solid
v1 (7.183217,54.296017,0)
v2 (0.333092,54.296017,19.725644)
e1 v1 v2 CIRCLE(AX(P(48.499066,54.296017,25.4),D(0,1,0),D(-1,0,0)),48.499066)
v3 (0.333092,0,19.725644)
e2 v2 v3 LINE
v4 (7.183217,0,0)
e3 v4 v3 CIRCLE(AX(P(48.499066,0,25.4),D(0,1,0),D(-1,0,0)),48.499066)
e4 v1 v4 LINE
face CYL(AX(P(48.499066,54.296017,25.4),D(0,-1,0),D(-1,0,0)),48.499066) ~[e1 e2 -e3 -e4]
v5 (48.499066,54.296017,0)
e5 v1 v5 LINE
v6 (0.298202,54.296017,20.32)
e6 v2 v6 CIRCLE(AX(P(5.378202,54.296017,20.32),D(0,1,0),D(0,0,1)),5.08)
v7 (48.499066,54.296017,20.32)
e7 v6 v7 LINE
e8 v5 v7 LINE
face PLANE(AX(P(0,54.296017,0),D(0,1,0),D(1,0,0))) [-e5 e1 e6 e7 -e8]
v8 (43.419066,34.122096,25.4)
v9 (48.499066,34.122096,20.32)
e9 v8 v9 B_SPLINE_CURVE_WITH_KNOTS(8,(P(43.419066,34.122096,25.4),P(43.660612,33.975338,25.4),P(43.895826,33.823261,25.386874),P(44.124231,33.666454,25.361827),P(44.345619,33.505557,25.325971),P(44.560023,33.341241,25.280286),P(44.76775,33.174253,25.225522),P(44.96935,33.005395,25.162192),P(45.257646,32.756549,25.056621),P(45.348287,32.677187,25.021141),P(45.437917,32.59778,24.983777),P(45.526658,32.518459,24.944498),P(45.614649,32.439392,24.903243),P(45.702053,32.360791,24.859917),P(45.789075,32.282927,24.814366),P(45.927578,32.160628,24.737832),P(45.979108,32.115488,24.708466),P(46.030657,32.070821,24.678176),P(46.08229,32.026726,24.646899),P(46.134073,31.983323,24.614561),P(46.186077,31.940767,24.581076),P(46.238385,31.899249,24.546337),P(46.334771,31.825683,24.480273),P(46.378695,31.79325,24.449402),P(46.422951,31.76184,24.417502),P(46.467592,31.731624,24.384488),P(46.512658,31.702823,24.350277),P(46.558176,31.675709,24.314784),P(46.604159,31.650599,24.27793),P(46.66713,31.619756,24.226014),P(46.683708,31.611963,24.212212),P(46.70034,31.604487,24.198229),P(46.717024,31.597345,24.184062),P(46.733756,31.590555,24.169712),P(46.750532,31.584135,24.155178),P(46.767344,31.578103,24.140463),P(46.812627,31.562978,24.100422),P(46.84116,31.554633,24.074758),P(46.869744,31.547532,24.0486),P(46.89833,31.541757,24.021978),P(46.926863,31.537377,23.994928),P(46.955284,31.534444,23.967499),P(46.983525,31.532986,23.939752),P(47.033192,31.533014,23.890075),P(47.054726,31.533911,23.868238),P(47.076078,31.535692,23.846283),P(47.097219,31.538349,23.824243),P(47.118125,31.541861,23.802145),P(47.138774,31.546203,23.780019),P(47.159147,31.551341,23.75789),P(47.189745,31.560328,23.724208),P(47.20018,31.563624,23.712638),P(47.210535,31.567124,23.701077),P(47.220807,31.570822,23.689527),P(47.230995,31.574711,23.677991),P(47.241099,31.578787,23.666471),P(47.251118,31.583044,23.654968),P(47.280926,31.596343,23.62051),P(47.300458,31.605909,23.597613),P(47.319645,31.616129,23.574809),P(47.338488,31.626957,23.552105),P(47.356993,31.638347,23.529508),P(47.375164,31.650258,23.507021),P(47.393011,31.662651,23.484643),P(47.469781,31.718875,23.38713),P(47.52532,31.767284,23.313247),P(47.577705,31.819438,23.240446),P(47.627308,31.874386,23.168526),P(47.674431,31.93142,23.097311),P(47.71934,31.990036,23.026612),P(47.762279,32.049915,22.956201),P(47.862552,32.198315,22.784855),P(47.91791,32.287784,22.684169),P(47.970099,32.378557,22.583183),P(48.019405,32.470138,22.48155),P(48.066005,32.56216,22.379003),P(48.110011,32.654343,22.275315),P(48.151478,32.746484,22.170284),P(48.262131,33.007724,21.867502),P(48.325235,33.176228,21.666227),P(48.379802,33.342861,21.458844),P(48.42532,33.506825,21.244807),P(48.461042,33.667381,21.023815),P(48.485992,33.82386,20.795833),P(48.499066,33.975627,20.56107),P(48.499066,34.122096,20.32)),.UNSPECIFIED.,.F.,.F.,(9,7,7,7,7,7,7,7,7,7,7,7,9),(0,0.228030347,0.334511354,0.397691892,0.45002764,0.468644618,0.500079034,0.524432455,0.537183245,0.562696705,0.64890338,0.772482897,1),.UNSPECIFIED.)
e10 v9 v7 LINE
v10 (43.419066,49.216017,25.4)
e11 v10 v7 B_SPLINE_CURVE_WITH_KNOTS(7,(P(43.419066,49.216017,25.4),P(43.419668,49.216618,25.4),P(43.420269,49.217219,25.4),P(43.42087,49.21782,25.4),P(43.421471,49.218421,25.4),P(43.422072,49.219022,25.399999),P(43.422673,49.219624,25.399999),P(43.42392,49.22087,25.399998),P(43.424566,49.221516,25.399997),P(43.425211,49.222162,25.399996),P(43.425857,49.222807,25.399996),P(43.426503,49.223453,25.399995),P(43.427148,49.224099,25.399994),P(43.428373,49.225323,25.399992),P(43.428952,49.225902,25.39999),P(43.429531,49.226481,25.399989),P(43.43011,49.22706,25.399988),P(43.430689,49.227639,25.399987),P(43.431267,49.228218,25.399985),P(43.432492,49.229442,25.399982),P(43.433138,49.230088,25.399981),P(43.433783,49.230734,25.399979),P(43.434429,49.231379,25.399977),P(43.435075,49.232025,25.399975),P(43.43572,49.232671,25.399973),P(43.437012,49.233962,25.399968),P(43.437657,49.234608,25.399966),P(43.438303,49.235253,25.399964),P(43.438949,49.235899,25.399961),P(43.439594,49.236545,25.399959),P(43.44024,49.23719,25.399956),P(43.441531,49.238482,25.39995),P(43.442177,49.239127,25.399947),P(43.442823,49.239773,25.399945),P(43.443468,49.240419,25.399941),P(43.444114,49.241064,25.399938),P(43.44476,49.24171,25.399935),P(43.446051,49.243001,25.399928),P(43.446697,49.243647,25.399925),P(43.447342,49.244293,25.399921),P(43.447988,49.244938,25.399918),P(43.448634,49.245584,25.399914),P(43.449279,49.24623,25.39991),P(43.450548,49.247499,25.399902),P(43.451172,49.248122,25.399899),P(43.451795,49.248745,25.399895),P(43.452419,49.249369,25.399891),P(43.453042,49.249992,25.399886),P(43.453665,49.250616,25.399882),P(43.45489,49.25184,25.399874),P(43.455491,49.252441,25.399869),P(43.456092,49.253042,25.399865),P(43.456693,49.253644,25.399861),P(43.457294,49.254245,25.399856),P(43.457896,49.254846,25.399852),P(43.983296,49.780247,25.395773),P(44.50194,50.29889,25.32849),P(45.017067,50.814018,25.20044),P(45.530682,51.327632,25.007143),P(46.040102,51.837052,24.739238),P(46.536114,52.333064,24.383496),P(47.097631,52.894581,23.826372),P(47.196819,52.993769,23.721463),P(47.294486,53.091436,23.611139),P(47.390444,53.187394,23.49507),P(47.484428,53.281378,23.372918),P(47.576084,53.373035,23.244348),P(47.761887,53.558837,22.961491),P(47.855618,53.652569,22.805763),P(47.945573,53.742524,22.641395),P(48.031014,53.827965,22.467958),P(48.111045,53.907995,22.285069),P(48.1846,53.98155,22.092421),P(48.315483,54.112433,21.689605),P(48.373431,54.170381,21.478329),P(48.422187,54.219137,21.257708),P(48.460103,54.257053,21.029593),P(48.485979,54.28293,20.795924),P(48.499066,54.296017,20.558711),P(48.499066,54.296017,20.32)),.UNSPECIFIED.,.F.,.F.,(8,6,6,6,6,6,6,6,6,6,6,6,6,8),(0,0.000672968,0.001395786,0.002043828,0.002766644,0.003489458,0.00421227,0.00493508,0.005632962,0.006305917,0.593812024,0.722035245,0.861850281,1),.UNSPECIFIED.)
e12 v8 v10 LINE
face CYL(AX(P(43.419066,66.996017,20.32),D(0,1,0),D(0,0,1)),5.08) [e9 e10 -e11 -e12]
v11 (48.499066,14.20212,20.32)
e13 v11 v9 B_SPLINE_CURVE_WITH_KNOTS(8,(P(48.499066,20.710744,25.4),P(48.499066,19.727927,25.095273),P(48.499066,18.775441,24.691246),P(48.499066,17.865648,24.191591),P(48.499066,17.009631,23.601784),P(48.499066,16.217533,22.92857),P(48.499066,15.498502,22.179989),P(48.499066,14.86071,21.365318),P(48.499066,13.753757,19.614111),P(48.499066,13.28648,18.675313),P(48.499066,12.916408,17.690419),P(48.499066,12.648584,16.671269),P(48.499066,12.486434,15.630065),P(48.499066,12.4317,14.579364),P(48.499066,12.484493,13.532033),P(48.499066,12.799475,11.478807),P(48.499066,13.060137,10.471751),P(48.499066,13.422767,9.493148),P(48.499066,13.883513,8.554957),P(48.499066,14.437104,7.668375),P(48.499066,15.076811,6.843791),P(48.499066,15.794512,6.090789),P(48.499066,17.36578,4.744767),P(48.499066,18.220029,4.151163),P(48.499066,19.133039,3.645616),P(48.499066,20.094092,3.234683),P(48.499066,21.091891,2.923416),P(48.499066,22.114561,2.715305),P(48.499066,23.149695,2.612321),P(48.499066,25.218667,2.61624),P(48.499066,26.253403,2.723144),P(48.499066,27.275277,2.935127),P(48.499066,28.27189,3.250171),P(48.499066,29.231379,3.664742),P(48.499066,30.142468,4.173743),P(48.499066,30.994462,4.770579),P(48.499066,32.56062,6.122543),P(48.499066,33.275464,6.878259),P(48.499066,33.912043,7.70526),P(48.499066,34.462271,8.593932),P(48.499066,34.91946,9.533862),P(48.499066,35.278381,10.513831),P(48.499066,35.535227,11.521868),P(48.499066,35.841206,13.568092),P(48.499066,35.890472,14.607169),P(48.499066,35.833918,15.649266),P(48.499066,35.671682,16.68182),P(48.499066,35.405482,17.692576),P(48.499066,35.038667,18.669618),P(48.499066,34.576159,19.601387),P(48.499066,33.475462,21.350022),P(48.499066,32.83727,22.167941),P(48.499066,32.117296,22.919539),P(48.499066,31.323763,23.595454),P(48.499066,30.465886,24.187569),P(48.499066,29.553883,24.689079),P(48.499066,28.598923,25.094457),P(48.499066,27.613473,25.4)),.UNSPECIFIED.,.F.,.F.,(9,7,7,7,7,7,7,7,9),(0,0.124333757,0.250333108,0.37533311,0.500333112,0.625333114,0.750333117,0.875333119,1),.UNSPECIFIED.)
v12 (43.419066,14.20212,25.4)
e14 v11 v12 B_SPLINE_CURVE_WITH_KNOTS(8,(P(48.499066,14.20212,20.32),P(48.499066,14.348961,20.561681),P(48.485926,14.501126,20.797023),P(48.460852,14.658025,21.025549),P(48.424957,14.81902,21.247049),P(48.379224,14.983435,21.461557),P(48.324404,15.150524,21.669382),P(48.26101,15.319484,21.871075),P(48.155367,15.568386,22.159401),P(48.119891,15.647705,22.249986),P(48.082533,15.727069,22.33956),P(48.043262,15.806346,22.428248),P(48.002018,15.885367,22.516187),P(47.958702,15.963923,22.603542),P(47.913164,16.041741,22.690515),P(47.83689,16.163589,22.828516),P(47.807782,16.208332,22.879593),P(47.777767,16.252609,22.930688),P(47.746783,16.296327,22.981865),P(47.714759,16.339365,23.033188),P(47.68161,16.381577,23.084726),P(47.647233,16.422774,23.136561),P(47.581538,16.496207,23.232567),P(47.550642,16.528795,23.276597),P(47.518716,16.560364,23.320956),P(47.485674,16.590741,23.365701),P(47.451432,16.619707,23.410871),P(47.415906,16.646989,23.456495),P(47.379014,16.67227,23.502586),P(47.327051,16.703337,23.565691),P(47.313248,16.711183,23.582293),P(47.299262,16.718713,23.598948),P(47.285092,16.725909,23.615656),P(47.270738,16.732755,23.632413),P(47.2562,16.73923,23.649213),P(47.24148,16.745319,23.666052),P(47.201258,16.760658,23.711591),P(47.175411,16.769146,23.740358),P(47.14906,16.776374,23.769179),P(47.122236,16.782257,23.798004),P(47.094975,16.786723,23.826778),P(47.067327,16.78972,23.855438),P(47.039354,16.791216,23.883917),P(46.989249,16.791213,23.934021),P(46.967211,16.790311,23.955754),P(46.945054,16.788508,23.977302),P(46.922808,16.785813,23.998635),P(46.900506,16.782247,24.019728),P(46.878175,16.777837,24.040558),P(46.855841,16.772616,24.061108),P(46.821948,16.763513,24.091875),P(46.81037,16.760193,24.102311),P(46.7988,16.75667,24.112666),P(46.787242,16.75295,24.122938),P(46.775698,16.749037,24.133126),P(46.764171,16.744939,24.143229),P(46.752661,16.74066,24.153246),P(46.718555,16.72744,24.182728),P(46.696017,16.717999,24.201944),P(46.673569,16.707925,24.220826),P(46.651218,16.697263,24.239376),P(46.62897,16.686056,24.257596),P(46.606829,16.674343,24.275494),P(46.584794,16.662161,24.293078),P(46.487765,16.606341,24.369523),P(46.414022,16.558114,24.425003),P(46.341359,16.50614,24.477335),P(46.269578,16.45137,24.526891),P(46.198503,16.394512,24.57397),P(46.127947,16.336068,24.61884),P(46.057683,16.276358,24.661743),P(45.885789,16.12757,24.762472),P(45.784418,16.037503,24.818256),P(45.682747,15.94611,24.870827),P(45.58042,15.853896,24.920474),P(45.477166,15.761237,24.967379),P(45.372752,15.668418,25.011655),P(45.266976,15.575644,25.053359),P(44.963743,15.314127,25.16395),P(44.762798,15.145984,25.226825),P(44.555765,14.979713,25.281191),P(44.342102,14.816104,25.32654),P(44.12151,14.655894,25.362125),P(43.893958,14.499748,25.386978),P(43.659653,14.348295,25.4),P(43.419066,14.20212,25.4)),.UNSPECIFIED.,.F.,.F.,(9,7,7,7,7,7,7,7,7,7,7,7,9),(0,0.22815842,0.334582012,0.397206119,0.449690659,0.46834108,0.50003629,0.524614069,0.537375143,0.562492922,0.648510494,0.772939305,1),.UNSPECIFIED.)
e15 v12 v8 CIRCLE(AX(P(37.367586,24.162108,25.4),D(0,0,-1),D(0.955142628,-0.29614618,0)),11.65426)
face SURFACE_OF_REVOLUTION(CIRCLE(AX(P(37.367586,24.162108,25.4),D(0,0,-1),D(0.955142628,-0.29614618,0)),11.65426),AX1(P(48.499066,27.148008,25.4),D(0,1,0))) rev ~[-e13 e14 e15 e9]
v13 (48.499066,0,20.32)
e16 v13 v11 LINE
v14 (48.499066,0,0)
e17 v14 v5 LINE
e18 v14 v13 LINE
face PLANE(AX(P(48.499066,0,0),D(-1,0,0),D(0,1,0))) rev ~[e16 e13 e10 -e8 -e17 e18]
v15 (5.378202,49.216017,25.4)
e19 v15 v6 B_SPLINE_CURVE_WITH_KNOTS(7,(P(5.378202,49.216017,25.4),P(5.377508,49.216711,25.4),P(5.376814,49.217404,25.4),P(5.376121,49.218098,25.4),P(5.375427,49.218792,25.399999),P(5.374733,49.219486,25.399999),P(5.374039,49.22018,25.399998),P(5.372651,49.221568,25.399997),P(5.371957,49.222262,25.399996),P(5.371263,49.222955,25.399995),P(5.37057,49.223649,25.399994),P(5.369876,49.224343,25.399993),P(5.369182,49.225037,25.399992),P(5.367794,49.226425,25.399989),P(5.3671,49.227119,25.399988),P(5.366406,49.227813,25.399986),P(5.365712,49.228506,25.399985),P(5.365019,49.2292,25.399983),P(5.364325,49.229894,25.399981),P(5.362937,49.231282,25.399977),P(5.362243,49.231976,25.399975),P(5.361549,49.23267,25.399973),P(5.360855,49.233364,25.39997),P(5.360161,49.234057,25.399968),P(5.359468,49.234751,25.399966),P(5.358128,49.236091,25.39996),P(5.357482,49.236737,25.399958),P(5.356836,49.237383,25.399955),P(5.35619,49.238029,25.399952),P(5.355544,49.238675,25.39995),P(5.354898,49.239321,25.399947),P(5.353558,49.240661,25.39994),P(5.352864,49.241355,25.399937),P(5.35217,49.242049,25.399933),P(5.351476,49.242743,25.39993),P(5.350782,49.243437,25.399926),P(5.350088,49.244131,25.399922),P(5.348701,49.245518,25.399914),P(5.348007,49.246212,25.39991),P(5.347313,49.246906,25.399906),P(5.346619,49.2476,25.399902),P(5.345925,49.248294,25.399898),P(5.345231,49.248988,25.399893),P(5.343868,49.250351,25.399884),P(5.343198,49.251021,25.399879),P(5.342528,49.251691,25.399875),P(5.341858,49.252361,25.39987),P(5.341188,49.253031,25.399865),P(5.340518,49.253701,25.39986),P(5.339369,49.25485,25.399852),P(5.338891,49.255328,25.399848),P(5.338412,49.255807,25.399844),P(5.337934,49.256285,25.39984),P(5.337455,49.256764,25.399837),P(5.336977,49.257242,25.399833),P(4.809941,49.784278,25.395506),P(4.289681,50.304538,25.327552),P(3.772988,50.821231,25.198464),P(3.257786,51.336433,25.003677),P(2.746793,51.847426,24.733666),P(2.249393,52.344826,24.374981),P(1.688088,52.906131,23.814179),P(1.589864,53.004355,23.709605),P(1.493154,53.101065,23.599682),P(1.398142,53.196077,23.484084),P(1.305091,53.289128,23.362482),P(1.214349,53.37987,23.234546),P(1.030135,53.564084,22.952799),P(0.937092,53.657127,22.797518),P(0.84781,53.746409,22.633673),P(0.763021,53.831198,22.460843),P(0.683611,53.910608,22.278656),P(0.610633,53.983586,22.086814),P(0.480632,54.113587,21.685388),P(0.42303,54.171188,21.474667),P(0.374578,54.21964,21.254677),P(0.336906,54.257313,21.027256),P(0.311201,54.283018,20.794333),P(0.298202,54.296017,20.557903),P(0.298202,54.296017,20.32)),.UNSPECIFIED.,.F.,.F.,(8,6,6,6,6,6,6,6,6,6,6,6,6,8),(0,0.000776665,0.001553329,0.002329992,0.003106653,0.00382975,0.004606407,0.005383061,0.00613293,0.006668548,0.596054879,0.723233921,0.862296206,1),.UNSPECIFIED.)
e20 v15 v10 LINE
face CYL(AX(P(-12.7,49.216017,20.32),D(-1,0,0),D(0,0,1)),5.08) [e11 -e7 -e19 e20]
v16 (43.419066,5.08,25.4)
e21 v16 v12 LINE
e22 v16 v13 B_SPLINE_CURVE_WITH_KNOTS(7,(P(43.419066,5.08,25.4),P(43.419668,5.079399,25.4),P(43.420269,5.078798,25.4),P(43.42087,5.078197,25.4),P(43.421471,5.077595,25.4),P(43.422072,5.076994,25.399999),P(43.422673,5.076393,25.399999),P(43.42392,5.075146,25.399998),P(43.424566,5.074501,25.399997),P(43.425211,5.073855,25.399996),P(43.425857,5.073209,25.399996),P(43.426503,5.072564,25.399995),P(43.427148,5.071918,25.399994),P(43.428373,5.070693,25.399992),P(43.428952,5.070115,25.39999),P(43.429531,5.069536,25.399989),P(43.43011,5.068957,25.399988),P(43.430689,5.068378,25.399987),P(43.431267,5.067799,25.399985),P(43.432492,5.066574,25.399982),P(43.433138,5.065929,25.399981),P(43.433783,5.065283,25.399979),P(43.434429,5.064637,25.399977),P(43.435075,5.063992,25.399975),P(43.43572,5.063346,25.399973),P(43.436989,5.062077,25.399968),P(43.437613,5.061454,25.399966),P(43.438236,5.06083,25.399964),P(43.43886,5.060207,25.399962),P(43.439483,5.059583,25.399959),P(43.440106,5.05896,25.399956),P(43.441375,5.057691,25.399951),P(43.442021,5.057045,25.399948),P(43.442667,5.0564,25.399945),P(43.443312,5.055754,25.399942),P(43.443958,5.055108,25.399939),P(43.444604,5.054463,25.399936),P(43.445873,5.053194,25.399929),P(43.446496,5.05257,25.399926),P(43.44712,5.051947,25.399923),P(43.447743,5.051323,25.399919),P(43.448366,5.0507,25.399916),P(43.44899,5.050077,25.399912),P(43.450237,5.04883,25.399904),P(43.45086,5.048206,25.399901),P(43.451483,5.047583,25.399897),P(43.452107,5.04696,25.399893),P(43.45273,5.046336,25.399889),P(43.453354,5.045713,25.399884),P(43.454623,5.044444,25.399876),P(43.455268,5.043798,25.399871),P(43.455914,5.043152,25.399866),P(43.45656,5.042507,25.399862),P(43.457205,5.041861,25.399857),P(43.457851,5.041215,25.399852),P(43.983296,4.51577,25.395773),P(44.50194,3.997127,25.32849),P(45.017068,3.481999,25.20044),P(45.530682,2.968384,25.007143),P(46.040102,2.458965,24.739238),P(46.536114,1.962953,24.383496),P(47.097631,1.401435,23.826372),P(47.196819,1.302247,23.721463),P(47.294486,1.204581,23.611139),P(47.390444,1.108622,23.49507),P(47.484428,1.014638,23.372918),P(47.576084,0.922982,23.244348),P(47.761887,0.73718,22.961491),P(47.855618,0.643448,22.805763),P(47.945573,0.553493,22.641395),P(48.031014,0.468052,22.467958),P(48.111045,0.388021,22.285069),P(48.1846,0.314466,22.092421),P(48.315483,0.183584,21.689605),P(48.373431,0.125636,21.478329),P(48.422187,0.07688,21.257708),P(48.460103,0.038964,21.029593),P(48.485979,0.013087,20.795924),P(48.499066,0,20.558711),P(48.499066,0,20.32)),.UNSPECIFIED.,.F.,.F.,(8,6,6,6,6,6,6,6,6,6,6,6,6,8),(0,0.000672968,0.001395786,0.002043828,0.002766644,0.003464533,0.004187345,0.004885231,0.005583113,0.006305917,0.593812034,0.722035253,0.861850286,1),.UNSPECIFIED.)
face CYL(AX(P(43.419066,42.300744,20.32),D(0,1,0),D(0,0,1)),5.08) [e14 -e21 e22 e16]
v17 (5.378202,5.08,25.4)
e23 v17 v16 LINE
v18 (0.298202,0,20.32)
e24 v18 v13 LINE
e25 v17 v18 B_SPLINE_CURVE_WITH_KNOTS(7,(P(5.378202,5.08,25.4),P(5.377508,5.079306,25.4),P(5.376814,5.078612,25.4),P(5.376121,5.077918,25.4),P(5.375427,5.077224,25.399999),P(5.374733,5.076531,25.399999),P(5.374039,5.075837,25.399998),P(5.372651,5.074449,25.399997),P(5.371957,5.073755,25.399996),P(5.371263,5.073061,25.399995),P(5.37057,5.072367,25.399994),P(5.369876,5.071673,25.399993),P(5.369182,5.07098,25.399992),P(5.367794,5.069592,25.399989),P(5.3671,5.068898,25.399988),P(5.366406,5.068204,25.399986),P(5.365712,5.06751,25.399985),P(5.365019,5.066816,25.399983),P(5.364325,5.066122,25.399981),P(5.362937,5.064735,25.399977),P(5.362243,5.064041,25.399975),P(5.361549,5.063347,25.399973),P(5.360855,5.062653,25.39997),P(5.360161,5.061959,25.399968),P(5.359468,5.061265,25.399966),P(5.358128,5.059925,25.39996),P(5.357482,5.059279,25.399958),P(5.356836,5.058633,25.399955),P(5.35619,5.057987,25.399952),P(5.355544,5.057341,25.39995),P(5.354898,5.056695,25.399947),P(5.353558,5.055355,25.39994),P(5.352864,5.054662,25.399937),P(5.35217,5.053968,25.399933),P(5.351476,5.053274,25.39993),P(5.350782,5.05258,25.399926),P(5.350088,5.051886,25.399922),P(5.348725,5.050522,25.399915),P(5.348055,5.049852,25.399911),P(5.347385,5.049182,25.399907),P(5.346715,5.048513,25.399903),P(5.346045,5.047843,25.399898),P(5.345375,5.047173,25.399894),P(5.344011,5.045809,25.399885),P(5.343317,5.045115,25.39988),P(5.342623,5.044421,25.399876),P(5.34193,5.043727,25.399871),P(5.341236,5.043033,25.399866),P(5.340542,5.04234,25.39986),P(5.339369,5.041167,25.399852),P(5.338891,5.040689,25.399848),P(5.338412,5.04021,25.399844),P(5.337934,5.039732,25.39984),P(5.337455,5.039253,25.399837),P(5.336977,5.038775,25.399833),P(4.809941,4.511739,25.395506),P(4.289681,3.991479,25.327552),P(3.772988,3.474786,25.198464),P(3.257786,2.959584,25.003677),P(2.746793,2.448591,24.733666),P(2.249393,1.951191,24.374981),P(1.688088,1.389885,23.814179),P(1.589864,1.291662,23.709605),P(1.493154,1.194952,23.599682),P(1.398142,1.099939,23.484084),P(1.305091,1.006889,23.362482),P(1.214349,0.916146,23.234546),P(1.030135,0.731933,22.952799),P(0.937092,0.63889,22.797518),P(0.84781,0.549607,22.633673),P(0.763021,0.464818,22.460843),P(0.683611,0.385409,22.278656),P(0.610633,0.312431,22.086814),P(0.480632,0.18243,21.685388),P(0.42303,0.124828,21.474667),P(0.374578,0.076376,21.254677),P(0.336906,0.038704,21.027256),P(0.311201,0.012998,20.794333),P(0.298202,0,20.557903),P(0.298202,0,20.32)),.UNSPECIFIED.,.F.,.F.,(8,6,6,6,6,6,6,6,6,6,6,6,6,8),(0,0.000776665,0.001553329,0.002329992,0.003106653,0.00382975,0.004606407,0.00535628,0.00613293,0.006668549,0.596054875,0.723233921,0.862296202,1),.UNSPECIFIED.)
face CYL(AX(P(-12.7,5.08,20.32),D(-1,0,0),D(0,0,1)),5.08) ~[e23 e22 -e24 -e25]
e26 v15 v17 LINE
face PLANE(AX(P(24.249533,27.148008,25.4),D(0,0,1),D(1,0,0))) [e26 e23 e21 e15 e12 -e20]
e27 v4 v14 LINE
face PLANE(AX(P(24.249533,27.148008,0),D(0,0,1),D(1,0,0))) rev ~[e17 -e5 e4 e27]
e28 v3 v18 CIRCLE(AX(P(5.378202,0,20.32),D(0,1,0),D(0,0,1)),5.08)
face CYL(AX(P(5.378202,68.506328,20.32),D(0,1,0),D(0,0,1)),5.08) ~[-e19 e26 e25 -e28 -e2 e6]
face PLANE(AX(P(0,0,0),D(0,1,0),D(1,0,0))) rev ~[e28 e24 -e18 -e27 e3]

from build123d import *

# Parameters (mm, degrees)
F0_W        = 48.4990663826
F0_H        = 54.2960166931
F1_DEPTH    = 25.4
F4_T1_DEPTH = 73.8990663826
F4_T3_DEPTH = 55.000743558
F4_T5_DEPTH = 60.9725440939
F4_T7_DEPTH = 82.7166388813


# Not quite as in the source:
# - a fillet or chamfer that OpenCascade refuses, or shapes differently, is made with other operations: its cross-section is extruded or revolved along the edge and cut away or added


with BuildPart() as f1:
    # F0 (on Top) → F1 (new body)
    with BuildSketch(Plane.XY):
        with Locations((24.2495331913, 27.1480083466)):
            Rectangle(F0_W, F0_H)
    extrude(amount=F1_DEPTH)

    # F2 (on face) → F3 (revolve, intersect)
    with BuildSketch(Plane.XY.offset(25.4)):
        with BuildLine():
            ThreePointArc((48.4990663826, 20.710743558), (25.7133262446, 24.1621080786), (48.4990663826, 27.6134725992))
            Line((48.4990663826, 27.6134725992), (48.4990663826, 54.2960166931))
            Line((48.4990663826, 54.2960166931), (0, 54.2960166931))
            Line((0, 54.2960166931), (0, 0))
            Line((0, 0), (48.4990663826, 0))
            Line((48.4990663826, 0), (48.4990663826, 20.710743558))
        make_face()
    revolve(axis=Axis((48.4990663826, 27.1480083466, 25.4), (0, 1, 0)), mode=Mode.INTERSECT)

    # F4: fillet of radius 5.08 on 5 edges, made by hand

    # F4_s2 → F4_t1 (cut)
    with BuildSketch(Plane.YZ.offset(-12.7)):
        with BuildLine():
            ThreePointArc((5.08, 25.4), (1.4878975516, 23.9121024484), (0, 20.32))
            Line((0, 20.32), (0, 25.4))
            Line((0, 25.4), (5.08, 25.4))
        make_face()
        with BuildLine():
            ThreePointArc((49.2160166931, 25.4), (52.8081191415, 23.9121024484), (54.2960166931, 20.32))
            Line((54.2960166931, 20.32), (54.2960166931, 25.4))
            Line((54.2960166931, 25.4), (49.2160166931, 25.4))
        make_face()
    extrude(amount=F4_T1_DEPTH, mode=Mode.SUBTRACT)

    # F4_s4 → F4_t3 (cut)
    with BuildSketch(Plane.XZ.offset(-42.300743558)):
        with BuildLine():
            ThreePointArc((43.4190663826, 25.4), (47.0111688311, 23.9121024484), (48.4990663826, 20.32))
            Line((48.4990663826, 20.32), (48.4990663826, 25.4))
            Line((48.4990663826, 25.4), (43.4190663826, 25.4))
        make_face()
    extrude(amount=F4_T3_DEPTH, mode=Mode.SUBTRACT)

    # F4_s6 → F4_t5 (cut)
    with BuildSketch(Plane.XZ.offset(-66.9960166931)):
        with BuildLine():
            ThreePointArc((43.4190663826, 25.4), (47.0111688311, 23.9121024484), (48.4990663826, 20.32))
            Line((48.4990663826, 20.32), (48.4990663826, 25.4))
            Line((48.4990663826, 25.4), (43.4190663826, 25.4))
        make_face()
    extrude(amount=F4_T5_DEPTH, mode=Mode.SUBTRACT)

    # F4_s8 → F4_t7 (cut)
    with BuildSketch(Plane.XZ.offset(-68.5063277872)):
        with BuildLine():
            ThreePointArc((5.3782022269, 25.4), (1.5817742667, 23.6954310455), (0.3330916761, 19.7256435997))
            ThreePointArc((0.3330916761, 19.7256435997), (0.0833445319, 22.5579377812), (0, 25.4))
            Line((0, 25.4), (5.3782022269, 25.4))
        make_face()
    extrude(amount=F4_T7_DEPTH, mode=Mode.SUBTRACT)


solid = f1.part
